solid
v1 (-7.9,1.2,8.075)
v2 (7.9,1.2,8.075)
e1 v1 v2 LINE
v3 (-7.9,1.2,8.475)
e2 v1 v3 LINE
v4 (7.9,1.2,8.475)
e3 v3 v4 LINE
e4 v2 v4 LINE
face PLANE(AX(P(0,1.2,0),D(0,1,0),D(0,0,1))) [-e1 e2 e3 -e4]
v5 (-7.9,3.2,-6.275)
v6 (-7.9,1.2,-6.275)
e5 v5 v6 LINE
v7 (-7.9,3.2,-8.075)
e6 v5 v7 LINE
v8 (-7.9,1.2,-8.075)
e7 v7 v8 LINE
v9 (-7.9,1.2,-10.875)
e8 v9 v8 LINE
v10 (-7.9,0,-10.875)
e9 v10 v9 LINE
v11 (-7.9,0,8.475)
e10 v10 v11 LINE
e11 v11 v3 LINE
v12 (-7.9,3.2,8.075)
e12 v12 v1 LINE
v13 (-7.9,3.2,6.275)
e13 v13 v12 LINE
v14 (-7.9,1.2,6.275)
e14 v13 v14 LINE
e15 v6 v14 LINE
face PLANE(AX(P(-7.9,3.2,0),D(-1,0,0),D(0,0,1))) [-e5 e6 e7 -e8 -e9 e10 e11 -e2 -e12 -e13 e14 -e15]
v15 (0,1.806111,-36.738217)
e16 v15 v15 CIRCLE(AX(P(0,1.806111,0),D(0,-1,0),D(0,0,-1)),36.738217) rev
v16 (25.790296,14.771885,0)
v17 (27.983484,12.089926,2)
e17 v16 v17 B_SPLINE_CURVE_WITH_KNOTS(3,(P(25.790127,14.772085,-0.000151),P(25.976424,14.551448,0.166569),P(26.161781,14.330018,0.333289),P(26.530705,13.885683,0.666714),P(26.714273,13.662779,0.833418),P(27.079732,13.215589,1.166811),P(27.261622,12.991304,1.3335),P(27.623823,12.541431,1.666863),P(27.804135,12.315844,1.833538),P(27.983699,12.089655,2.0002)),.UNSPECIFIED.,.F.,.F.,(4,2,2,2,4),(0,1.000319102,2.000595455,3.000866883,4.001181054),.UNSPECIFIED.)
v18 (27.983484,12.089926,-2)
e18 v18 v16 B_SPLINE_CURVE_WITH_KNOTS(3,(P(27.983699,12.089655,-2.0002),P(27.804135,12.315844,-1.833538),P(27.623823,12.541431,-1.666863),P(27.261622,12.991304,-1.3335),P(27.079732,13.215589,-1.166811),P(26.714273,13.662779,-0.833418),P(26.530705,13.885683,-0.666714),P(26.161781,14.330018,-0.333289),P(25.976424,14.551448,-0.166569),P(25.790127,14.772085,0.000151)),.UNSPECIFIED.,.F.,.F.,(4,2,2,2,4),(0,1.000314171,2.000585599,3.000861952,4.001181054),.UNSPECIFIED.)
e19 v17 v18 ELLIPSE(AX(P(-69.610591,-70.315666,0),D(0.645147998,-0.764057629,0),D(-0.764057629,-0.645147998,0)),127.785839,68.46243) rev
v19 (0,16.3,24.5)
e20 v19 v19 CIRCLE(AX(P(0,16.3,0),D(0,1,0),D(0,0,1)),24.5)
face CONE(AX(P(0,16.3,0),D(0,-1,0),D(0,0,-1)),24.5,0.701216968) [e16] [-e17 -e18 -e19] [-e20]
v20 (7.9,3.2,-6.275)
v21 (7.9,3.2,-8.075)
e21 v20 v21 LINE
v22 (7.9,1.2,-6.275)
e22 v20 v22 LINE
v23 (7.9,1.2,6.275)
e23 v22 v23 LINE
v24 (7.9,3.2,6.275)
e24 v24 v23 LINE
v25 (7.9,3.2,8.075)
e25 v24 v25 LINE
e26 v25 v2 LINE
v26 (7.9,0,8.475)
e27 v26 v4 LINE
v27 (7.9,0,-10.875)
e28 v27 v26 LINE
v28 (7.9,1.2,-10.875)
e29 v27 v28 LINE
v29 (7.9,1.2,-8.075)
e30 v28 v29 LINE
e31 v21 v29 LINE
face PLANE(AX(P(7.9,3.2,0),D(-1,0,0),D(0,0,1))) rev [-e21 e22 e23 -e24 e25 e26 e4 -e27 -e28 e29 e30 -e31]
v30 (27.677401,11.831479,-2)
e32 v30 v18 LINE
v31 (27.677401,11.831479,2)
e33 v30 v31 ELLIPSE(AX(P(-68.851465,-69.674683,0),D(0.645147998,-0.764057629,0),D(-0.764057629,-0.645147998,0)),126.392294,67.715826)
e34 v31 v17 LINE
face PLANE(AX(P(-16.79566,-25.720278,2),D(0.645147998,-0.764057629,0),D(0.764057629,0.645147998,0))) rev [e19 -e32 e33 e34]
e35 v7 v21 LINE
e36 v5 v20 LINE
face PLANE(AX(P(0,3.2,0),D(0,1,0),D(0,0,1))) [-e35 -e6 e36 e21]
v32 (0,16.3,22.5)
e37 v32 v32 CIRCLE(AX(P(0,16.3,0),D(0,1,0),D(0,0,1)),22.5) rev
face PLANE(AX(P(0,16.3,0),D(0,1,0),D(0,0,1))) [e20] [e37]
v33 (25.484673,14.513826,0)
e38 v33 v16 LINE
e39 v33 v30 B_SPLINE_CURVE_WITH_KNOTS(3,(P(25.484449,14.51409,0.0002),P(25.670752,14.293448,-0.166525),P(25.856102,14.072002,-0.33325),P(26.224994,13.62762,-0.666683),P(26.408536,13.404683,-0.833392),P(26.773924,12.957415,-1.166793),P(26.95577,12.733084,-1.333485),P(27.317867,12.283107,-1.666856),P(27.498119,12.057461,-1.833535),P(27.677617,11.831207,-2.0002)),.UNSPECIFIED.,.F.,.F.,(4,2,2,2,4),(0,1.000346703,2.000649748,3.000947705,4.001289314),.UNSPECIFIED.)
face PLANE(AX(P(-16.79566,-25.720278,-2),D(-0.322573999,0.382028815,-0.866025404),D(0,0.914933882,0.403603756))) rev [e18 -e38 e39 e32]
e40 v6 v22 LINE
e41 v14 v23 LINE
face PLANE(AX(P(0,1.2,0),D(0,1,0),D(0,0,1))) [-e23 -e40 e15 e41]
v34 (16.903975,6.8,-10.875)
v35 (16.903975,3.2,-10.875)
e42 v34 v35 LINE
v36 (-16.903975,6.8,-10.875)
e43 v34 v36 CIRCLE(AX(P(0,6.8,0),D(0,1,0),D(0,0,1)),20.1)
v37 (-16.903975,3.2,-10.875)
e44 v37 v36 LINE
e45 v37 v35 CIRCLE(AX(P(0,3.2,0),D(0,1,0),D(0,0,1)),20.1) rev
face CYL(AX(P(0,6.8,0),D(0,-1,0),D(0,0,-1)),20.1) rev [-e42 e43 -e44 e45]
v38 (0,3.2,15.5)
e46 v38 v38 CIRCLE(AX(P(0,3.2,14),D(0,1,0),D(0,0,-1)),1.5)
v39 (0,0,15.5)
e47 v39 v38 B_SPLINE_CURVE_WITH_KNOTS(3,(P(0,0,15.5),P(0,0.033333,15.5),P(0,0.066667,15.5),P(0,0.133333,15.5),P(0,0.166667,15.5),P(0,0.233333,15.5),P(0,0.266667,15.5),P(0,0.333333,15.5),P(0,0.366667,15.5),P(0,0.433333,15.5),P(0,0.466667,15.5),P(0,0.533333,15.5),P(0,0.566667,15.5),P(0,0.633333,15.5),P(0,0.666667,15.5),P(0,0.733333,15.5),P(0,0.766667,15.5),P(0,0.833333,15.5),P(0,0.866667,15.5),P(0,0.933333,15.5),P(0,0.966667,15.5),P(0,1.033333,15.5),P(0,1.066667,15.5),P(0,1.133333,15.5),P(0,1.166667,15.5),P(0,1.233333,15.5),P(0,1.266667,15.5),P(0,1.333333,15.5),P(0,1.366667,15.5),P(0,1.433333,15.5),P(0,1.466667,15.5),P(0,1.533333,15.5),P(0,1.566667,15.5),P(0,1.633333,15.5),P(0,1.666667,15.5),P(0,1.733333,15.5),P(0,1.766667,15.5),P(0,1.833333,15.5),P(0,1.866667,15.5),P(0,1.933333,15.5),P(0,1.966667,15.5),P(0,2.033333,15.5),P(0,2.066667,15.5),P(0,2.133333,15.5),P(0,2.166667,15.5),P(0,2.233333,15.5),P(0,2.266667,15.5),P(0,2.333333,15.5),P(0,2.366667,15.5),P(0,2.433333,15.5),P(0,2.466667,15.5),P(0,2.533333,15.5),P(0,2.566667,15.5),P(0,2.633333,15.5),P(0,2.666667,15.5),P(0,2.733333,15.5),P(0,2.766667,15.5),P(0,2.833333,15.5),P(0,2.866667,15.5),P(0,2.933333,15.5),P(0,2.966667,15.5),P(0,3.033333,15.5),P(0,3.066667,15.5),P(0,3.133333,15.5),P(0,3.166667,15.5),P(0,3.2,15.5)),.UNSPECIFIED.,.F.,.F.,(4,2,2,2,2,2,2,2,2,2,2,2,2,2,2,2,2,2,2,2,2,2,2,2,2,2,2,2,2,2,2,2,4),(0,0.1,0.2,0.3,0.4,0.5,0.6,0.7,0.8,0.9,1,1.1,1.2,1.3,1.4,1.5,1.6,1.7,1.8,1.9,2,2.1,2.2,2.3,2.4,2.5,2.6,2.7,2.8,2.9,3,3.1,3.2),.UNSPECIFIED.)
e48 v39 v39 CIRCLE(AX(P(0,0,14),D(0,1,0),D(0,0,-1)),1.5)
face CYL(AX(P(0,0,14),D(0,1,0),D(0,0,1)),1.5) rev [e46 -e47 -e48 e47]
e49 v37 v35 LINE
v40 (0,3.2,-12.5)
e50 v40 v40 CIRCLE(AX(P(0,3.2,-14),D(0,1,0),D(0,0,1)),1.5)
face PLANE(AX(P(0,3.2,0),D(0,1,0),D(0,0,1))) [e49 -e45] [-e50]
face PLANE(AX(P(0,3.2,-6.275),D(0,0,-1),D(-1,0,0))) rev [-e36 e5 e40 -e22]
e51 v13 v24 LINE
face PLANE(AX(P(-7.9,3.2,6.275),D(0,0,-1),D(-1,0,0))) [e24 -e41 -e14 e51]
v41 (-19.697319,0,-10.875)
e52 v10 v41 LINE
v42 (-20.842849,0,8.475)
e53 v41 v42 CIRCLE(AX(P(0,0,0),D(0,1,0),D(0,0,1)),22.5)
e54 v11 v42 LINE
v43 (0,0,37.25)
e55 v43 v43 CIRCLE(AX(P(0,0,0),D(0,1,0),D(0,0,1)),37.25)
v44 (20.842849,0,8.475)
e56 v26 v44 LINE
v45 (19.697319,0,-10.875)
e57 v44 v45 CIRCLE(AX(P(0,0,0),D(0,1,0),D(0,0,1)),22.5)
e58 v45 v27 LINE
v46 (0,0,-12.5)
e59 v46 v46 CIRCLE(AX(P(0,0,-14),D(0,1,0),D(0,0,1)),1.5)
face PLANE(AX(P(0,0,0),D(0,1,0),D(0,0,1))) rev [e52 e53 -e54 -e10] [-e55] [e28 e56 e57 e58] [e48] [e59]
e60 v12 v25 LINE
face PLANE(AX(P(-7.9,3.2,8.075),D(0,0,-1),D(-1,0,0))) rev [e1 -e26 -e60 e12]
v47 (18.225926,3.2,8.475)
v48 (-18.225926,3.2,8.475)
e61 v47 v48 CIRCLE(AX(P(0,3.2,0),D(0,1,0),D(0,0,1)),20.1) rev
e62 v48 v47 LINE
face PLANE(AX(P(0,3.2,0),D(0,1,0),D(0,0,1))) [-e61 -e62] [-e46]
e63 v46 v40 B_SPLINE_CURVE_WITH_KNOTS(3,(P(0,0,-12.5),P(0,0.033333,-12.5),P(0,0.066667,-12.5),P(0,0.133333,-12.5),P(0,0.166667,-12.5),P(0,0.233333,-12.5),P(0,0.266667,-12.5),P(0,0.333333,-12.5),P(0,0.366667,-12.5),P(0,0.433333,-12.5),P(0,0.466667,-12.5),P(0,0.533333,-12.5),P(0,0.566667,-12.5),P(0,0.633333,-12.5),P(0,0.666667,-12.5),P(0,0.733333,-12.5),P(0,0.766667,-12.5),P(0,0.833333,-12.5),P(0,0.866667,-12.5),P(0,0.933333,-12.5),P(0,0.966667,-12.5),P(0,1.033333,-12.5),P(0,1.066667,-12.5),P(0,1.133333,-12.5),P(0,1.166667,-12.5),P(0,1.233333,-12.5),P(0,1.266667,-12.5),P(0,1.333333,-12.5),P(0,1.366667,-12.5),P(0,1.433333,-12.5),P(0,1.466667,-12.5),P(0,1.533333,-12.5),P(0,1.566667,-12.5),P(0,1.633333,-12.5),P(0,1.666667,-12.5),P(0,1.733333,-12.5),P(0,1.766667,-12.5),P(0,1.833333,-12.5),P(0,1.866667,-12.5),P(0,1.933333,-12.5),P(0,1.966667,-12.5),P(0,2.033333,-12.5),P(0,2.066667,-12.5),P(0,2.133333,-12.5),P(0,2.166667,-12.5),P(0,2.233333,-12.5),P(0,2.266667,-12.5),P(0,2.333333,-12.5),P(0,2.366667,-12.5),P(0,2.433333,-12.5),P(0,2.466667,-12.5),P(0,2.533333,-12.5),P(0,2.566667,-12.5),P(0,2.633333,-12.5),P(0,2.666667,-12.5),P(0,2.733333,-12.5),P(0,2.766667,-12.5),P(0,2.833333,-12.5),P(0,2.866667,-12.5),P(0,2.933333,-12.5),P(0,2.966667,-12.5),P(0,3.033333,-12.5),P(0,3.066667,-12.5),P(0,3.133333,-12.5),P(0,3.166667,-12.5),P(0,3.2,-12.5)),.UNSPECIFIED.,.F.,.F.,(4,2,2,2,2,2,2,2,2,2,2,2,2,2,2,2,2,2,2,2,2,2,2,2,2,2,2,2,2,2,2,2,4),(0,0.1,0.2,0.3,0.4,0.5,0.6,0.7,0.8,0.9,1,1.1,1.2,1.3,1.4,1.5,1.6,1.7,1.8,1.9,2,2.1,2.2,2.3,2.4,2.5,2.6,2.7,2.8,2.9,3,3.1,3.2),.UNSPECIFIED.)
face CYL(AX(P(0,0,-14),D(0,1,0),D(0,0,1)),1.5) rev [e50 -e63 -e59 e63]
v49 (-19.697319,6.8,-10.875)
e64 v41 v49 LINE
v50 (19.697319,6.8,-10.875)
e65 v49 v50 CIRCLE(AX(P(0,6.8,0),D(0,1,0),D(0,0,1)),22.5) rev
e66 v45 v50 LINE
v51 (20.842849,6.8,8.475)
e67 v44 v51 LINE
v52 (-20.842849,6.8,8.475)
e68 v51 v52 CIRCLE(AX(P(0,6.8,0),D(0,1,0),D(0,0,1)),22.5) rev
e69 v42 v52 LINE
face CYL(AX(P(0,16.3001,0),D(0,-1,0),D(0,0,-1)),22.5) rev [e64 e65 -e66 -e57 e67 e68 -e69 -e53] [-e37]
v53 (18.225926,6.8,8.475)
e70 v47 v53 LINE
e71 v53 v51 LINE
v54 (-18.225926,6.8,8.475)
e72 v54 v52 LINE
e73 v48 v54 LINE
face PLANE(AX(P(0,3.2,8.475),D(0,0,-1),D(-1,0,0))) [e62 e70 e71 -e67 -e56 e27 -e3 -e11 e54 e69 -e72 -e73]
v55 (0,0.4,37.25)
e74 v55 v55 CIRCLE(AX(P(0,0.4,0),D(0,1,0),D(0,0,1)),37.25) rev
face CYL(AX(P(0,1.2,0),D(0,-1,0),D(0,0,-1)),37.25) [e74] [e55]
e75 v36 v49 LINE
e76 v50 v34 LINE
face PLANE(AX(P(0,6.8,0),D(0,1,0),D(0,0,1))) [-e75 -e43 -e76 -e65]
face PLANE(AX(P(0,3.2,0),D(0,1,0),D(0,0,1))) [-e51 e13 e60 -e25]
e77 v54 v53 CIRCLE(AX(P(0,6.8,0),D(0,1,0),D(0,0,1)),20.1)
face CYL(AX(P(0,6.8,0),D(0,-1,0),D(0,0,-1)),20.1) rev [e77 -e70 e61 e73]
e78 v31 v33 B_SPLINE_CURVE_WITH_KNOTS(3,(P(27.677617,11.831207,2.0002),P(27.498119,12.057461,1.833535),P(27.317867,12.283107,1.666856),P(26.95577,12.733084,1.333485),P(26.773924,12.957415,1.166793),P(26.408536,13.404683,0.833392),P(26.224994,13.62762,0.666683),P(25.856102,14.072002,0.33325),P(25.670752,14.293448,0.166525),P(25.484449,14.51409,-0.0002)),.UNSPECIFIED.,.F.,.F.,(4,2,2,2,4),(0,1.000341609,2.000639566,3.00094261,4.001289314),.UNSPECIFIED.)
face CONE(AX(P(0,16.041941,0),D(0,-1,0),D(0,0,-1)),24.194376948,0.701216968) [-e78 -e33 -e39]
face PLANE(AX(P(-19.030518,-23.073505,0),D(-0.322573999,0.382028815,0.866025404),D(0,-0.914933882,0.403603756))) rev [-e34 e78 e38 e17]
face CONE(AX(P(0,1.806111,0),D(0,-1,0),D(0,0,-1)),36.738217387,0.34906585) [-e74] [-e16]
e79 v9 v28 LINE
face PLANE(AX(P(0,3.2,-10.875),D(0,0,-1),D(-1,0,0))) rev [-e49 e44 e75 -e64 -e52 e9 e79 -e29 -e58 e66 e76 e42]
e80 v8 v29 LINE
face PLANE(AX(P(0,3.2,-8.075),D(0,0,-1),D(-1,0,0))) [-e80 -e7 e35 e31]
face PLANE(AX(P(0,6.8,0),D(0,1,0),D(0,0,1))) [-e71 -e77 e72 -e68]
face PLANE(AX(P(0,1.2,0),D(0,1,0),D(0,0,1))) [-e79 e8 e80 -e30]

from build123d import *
from build123d.topology import SkipClean

# Parameters (mm, degrees)
SKETCH1_R           = 37.25
BOSS_EXTRUDE1_DEPTH = 1.2
SKETCH2_R           = 20.1
SKETCH2_W           = 26.3
SKETCH2_H           = 19.35
SKETCH2_W_2         = 15.8
SKETCH2_H_2         = 1.8
BOSS_EXTRUDE3_DEPTH = 2
SKETCH2_5_R         = 22.5
SKETCH2_5_R_2       = 20.1
BOSS_EXTRUDE4_DEPTH = 5.6
SKETCH2_7_R         = 22.5
SKETCH2_7_R_2       = 20.1
SKETCH2_7_W         = 26.3
SKETCH2_7_H         = 19.35
SKETCH2_7_W_2       = 15.8
SKETCH2_7_H_2       = 1.8
CUT_EXTRUDE1_DEPTH  = 55.800866781
CUT_EXTRUDE2_DEPTH  = 54.52919764
SKETCH8_R           = 1.5
CUT_EXTRUDE3_DEPTH  = 55.283837374
CUT_EXTRUDE4_DEPTH  = 54.52919764
CUT_EXTRUDE5_REACH  = 74.76


with BuildPart() as part:
    # Sketch1 → Boss-Extrude1 (new body)
    with BuildSketch(Plane(origin=(0, 0, 0), x_dir=(1, 0, 0), z_dir=(0, 1, 0))):
        with Locations(Location((0, 0, 0), (0, 0, 270))):
            Circle(SKETCH1_R)
    extrude(amount=BOSS_EXTRUDE1_DEPTH)

    # Sketch2 → Boss-Extrude3 (add)
    # profile 1 of 3: a face of its own
    with BuildSketch(Plane(origin=(0, 1.2, 0), x_dir=(1, 0, 0), z_dir=(0, 1, 0))):
        with Locations(Location((0, 0, 0), (0, 0, 270))):
            Circle(SKETCH2_R)
        with Locations((-2.45, 1.2)):
            Rectangle(SKETCH2_W, SKETCH2_H, mode=Mode.SUBTRACT)
    # profile 2 of 3: a face of its own
    with BuildSketch(Plane(origin=(0, 1.2, 0), x_dir=(1, 0, 0), z_dir=(0, 1, 0))):
        with Locations((0, 7.175)):
            Rectangle(SKETCH2_W_2, SKETCH2_H_2)
    # profile 3 of 3: a face of its own
    with BuildSketch(Plane(origin=(0, 1.2, 0), x_dir=(1, 0, 0), z_dir=(0, 1, 0))):
        with Locations((0, -7.175)):
            Rectangle(SKETCH2_W_2, SKETCH2_H_2)
    extrude(amount=BOSS_EXTRUDE3_DEPTH)

    # Sketch2<5> → Boss-Extrude4 (add)
    with BuildSketch(Plane(origin=(0, 1.2, 0), x_dir=(1, 0, 0), z_dir=(0, 1, 0))):
        with Locations(Location((0, 0, 0), (0, 0, 270))):
            Circle(SKETCH2_5_R)
        with Locations(Location((0, 0, 0), (0, 0, 270))):
            Circle(SKETCH2_5_R_2, mode=Mode.SUBTRACT)
    extrude(amount=BOSS_EXTRUDE4_DEPTH)


with BuildPart() as body_2:
    # Loft1: read off the stored shape, not the designer's step
    # Loft1 outline → Loft1 (revolve)
    with BuildSketch(Plane.XY):
        Polygon((0, 16.3), (0, 1.2), (37.25, 1.2), (24.5, 16.3), align=None)
    revolve(axis=Axis((0, 0, 0), (0, 1, 0)))

    # Sketch2<7> → Cut-Extrude1 (cut, through all)
    # profile 1 of 5: a face of its own
    with BuildSketch(Plane(origin=(0, 1.2, 0), x_dir=(1, 0, 0), z_dir=(0, 1, 0))):
        with Locations(Location((0, 0, 0), (0, 0, 90))):
            Circle(SKETCH2_7_R)
        with Locations(Location((0, 0, 0), (0, 0, 270))):
            Circle(SKETCH2_7_R_2, mode=Mode.SUBTRACT)
    # profile 2 of 5: a face of its own
    with BuildSketch(Plane(origin=(0, 1.2, 0), x_dir=(1, 0, 0), z_dir=(0, 1, 0))):
        with Locations(Location((0, 0, 0), (0, 0, 270))):
            Circle(SKETCH2_7_R_2)
        with Locations((-2.45, 1.2)):
            Rectangle(SKETCH2_7_W, SKETCH2_7_H, mode=Mode.SUBTRACT)
    # profile 3 of 5: a face of its own
    with BuildSketch(Plane(origin=(0, 1.2, 0), x_dir=(1, 0, 0), z_dir=(0, 1, 0))):
        with Locations((-2.45, 1.2)):
            Rectangle(SKETCH2_7_W, SKETCH2_7_H)
        with Locations((0, 7.175)):
            Rectangle(SKETCH2_7_W_2, SKETCH2_7_H_2, mode=Mode.SUBTRACT)
        with Locations((0, -7.175)):
            Rectangle(SKETCH2_7_W_2, SKETCH2_7_H_2, mode=Mode.SUBTRACT)
    # profile 4 of 5: a face of its own
    with BuildSketch(Plane(origin=(0, 1.2, 0), x_dir=(1, 0, 0), z_dir=(0, 1, 0))):
        with Locations((0, 7.175)):
            Rectangle(SKETCH2_7_W_2, SKETCH2_7_H_2)
    # profile 5 of 5: a face of its own
    with BuildSketch(Plane(origin=(0, 1.2, 0), x_dir=(1, 0, 0), z_dir=(0, 1, 0))):
        with Locations((0, -7.175)):
            Rectangle(SKETCH2_7_W_2, SKETCH2_7_H_2)
    extrude(amount=CUT_EXTRUDE1_DEPTH, mode=Mode.SUBTRACT)


with BuildPart() as part_1:
    add(part.part)

    # Combine1: union body 2
    add(body_2.part)

    # Sketch7 → Cut-Extrude2 (cut, through all)
    with BuildSketch(Plane(origin=(0, 6.8, 0), x_dir=(1, 0, 0), z_dir=(0, 1, 0))):
        with BuildLine():
            Line((-7.9, 10.875), (-7.9, -8.475))
            Line((-7.9, -8.475), (-20.842849493, -8.475))
            ThreePointArc((-20.842849493, -8.475), (-22.460675412, 1.329684188), (-19.69731898, 10.875))
            Line((-19.69731898, 10.875), (-7.9, 10.875))
        make_face()
    extrude(amount=-CUT_EXTRUDE2_DEPTH, mode=Mode.SUBTRACT)

    # Sketch8 → Cut-Extrude3 (cut, through all)
    with BuildSketch(Plane(origin=(0, 3.2, 0), x_dir=(1, 0, 0), z_dir=(0, 1, 0))):
        with Locations(Location((0, 14, 0), (0, 0, 270))):
            Circle(SKETCH8_R)
        with Locations(Location((0, -14, 0), (0, 0, 270))):
            Circle(SKETCH8_R)
    extrude(amount=-CUT_EXTRUDE3_DEPTH, mode=Mode.SUBTRACT)

    # Sketch9 → Cut-Extrude4 (cut, through all)
    with SkipClean():  # the faces are left unmerged after this step: merging them gives an invalid solid
        with BuildSketch(Plane(origin=(0, 6.8, 0), x_dir=(1, 0, 0), z_dir=(0, 1, 0))):
            with BuildLine():
                Line((7.9, 10.875), (7.9, -8.475))
                Line((7.9, -8.475), (20.842849493, -8.475))
                ThreePointArc((20.842849493, -8.475), (22.460675412, 1.329684188), (19.69731898, 10.875))
                Line((19.69731898, 10.875), (7.9, 10.875))
            make_face()
        extrude(amount=-CUT_EXTRUDE4_DEPTH, mode=Mode.SUBTRACT)

    # Chamfer1: read off the stored shape, not the designer's step
    # Chamfer1 outline → Chamfer1 (revolve, cut)
    with SkipClean():  # the faces are left unmerged after this step: merging them gives an invalid solid
        with BuildSketch(Plane.XY):
            Polygon((37.25, 1.806111173), (36.738217387, 1.806111173), (37.25, 0.4), align=None)
        revolve(axis=Axis((0, 0, 0), (0, 1, 0)), mode=Mode.SUBTRACT)

    # Cut-Extrude5: up to this cone (the profile starts outside it)
    with SkipClean():  # the faces are left unmerged after this step: merging them gives an invalid solid
        cut_extrude5_end = Plane(origin=(0, 13.007369, 0), z_dir=(0, -1, 0)).offset(-31.6883035) * Cone(1e-06, 112.896593677, 133.704984453, align=(Align.CENTER, Align.CENTER, Align.MIN), mode=Mode.PRIVATE)
        # Sketch10 → Cut-Extrude5 (cut, up to the surface)
        with BuildSketch(Plane(origin=(22.337472556, 18.861110933, 0), x_dir=(0, 0, -1), z_dir=(0.7640576290946525, 0.6451479980766108, 0)), mode=Mode.PRIVATE) as cut_extrude5_sk1:
            Polygon((0, -5.351986599), (-2, -8.816088214), (2, -8.816088214), align=None)
        cut_extrude5_tool1 = extrude(cut_extrude5_sk1.sketch, amount=-CUT_EXTRUDE5_REACH, mode=Mode.PRIVATE) - cut_extrude5_end
        add(cut_extrude5_tool1.solids().sort_by_distance((27.280201, 13.007369, 0))[0], mode=Mode.SUBTRACT)


solid = part_1.part
